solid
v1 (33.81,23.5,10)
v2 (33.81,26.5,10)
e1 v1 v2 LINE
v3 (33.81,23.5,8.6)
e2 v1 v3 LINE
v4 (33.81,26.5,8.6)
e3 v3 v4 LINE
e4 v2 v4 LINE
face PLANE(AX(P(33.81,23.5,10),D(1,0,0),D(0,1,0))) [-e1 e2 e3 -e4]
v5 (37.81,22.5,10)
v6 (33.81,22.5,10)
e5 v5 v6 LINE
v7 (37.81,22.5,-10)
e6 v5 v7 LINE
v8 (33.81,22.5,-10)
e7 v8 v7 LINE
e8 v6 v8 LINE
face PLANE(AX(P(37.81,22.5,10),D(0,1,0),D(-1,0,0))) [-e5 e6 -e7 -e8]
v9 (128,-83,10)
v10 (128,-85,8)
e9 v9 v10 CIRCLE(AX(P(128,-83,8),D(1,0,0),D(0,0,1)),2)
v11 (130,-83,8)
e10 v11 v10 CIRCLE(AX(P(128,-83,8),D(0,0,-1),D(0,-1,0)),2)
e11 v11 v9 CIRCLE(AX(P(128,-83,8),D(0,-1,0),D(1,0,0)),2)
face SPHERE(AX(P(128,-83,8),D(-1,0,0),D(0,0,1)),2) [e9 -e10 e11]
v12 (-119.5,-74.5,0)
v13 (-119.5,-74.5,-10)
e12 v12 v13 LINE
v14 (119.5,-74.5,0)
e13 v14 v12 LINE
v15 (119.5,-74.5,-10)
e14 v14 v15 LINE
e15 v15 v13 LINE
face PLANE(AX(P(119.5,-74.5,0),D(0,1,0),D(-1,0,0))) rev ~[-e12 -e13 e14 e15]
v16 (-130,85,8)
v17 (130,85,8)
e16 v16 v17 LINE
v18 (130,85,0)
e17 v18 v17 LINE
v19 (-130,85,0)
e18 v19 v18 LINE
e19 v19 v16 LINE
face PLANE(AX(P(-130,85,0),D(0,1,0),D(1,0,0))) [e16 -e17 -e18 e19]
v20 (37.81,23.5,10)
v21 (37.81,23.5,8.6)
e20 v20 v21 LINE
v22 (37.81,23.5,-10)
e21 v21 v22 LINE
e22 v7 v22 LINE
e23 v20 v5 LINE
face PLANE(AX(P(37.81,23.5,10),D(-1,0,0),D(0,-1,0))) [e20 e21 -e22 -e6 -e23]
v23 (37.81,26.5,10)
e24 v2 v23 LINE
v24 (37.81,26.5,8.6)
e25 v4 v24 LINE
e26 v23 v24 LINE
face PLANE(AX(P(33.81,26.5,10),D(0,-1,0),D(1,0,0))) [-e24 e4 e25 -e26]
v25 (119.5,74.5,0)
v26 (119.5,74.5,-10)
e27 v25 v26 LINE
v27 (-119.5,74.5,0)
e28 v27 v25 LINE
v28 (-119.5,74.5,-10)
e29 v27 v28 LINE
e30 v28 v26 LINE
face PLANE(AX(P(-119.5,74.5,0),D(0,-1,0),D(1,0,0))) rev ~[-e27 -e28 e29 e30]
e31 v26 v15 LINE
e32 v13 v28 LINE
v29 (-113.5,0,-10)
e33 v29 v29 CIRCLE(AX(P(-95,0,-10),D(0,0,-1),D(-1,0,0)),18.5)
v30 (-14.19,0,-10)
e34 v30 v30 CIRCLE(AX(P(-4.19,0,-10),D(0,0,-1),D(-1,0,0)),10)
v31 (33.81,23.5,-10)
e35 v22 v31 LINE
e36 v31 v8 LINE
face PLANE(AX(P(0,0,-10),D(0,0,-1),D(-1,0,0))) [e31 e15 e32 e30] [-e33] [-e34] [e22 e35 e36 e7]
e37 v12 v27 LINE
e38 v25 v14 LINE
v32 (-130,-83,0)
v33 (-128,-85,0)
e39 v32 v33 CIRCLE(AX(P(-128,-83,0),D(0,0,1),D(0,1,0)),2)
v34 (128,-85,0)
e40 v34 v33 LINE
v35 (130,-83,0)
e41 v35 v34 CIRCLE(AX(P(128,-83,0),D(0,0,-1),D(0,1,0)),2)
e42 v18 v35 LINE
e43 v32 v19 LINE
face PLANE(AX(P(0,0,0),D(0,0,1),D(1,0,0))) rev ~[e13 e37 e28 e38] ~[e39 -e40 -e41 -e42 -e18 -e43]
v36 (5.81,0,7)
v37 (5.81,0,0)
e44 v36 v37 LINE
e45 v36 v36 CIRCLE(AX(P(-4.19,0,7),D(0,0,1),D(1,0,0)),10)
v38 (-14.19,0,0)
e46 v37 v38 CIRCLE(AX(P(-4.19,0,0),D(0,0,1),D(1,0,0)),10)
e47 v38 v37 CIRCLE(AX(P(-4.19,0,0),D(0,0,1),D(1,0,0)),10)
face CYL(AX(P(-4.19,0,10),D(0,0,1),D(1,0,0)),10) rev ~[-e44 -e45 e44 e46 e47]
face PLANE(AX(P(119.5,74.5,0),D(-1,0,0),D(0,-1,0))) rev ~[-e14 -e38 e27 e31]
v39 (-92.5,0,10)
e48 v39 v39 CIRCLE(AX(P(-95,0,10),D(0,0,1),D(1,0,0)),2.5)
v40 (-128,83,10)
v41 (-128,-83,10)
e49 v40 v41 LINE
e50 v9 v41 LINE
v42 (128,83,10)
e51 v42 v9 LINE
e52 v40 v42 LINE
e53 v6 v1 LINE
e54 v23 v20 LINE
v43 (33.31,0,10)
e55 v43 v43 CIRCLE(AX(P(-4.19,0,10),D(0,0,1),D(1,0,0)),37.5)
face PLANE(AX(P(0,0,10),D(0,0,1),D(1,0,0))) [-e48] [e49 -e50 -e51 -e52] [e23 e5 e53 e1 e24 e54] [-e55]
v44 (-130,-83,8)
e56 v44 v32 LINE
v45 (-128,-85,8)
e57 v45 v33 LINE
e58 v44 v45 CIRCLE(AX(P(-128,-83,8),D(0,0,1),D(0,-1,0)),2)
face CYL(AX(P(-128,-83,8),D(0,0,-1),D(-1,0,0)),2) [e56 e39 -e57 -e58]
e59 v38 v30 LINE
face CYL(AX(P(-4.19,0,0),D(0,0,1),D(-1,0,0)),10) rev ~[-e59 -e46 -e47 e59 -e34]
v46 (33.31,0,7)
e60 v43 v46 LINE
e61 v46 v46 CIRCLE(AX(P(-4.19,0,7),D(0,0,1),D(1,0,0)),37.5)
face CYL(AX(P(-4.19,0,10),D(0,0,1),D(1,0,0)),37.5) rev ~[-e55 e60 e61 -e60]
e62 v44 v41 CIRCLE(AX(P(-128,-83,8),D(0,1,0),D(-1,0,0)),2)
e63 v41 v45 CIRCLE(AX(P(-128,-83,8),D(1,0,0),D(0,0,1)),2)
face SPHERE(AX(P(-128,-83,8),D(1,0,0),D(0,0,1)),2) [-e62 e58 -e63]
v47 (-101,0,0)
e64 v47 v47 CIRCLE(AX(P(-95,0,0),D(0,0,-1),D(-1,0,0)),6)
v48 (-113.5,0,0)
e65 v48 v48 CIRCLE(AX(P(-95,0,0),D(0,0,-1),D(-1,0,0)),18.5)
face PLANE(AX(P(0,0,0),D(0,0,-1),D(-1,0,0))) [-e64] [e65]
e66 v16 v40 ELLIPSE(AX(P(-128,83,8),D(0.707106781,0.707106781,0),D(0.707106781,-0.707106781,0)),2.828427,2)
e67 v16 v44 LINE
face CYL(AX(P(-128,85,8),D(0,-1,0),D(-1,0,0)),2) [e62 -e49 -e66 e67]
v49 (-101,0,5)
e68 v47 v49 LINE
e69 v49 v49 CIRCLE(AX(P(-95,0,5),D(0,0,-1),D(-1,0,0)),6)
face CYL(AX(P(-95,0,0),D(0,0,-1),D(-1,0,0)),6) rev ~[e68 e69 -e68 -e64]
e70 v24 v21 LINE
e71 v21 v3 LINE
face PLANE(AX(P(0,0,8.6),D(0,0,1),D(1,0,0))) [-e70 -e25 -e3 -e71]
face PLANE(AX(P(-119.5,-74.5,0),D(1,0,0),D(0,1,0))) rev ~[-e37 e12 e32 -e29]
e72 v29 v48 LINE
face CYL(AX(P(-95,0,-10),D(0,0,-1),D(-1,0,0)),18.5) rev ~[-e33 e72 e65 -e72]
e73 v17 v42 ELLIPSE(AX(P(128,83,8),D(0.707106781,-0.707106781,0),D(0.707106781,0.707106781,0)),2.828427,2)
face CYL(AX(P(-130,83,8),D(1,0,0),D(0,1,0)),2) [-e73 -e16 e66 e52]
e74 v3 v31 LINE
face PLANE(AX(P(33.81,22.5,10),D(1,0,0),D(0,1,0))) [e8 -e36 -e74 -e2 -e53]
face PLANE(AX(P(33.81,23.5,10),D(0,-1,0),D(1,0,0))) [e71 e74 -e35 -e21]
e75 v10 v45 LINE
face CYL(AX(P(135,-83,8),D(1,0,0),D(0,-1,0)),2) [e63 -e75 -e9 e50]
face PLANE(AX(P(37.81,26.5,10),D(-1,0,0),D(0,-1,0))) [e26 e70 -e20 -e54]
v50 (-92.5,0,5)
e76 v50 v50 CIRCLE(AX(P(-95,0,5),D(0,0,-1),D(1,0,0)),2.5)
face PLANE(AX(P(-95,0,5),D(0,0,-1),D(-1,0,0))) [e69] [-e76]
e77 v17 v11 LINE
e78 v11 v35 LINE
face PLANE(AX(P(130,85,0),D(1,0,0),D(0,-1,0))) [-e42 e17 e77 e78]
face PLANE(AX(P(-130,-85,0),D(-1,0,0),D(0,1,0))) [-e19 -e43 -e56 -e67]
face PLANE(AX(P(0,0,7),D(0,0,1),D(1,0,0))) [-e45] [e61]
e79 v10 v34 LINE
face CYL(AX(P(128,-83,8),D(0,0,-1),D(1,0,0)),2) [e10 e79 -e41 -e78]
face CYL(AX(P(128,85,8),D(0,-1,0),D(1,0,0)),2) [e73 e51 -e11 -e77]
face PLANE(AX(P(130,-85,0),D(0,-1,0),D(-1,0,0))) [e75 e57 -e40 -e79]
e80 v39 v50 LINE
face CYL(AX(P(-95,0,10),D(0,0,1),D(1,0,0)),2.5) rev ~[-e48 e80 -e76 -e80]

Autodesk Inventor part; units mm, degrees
ref_plane "YZ Plane" through (0, 0, 0) normal (1, 0, 0) x (0, 1, 0)
ref_plane "XZ Plane" through (0, 0, 0) normal (0, 1, 0) x (-1, 0, 0)
ref_plane "XY Plane" through (0, 0, 0) normal (0, 0, 1) x (1, 0, 0)
sketch "Boceto2" plane through (0, 0, 0) normal (0, 0, 1) x (1, 0, 0)
  line L0 (130, -85) -> (-130, -85)
  line L1 (-130, -85) -> (-130, 85)
  line L2 (-130, 85) -> (130, 85)
  line L3 (130, 85) -> (130, -85)
  line L4 (130, -85) -> (-130, 85) construction
  line L5 (-130, -85) -> (130, 85) construction
  point P0 (0, 0)
  dimension "d0" = 260
  dimension "d1" = 170
extrude "Extrusión1" add sketch "Boceto2" along normal blind 10
sketch "Boceto3" plane through (0, 0, 10) normal (0, 0, 1) x (1, 0, 0)
  line L0 (-95, 0) -> (-4.19, 0) construction
  circle A0 centre (-95, 0) radius 2.5
  circle A1 centre (-4.19, 0) radius 10
  line L1 (-130, 85) -> (-130, -85) projected
  line L2 (130, -85) -> (130, 85) projected
  line L3 (-130, -85) -> (130, -85) projected
  line L4 (130, 0) -> (80, 0) construction
  line L5 (80, 0) -> (80, -23.2237) construction
  point P0 (0, 0)
  point P1 (-130, 0)
  dimension "d7" = 5
  dimension "d8" = 20
  dimension "d14" = 85
  dimension "d29" = 50
  dimension "d30" = 90.81
  dimension "d31" = 35
  dimension "d32" = 134.19
extrude "Extrusión2" cut sketch "Boceto3" against normal through all
sketch "Boceto5" plane through (0, 0, 0) normal (0, 0, -1) x (-1, 0, 0)
  line L0 (-130, -85) -> (-130, 85) projected
  line L1 (130, -85) -> (-130, -85)
  line L2 (-130, -85) -> (-130, 85)
  line L3 (-130, 85) -> (130, 85)
  line L4 (130, 85) -> (130, -85)
  line L5 (130, -85) -> (-130, 85) construction
  line L6 (-130, -85) -> (130, 85) construction
  line L7 (119.5, 74.5) -> (-119.5, 74.5)
  line L8 (-119.5, 74.5) -> (-119.5, -74.5)
  line L9 (-119.5, -74.5) -> (119.5, -74.5)
  line L10 (119.5, -74.5) -> (119.5, 74.5)
  circle A0 centre (4.19, 0) radius 10 projected
  circle A1 centre (4.19, 0) radius 20
  circle A2 centre (95, 0) radius 2.5 projected
  circle A3 centre (95, 0) radius 2.5
  point P0 (0, 0)
  dimension "d23" = 10.5
  dimension "d24" = 40
  dimension "d25" = 5
extrude "Extrusión4" add sketch "Boceto5" along normal blind 10 contours L10 L9 L8 L7 | A1
fillet "Empalme1" radius 2 1 edges at (0, -85, 10)
fillet "Empalme2" radius 2 7 edges at (0, 85, 10) (-130, -84.4142, 9.4142) (-130, -85, 4) (-130, 1, 10) (130, -84.4142, 9.4142) (130, -85, 4) (130, 1, 10)
sketch "Boceto6" plane through (0, 0, 10) normal (0, 0, 1) x (1, 0, 0)
  circle A0 centre (-4.19, 0) radius 10 projected
  line L0 (-4.19, 0) -> (35.81, 0)
  line L1 (35.81, 0) -> (35.81, 25)
  line L2 (37.81, 23.5) -> (33.81, 23.5)
  line L3 (33.81, 23.5) -> (33.81, 26.5)
  line L4 (33.81, 26.5) -> (37.81, 26.5)
  line L5 (37.81, 26.5) -> (37.81, 23.5)
  line L6 (37.81, 23.5) -> (33.81, 26.5) construction
  line L7 (33.81, 23.5) -> (37.81, 26.5) construction
  point P0 (0, 0)
  dimension "d35" = 40
  dimension "d36" = 25
  dimension "d38" = 4
  dimension "d39" = 3
extrude "Extrusión5" cut sketch "Boceto6" against normal blind 1.4 contours L2 L3 L4 L5
sketch "Boceto8" plane through (0, 0, 10) normal (0, 0, 1) x (1, 0, 0)
  line L0 (33.81, 23.5) -> (33.81, 26.5) projected
  line L1 (33.81, 23.5) -> (37.81, 23.5)
  line L2 (37.81, 23.5) -> (37.81, 22.5)
  line L3 (37.81, 22.5) -> (33.81, 22.5)
  line L4 (33.81, 22.5) -> (33.81, 23.5)
  point P0 (0, 0)
  dimension "d42" = 4
  dimension "d43" = 1
extrude "Extrusión6" cut sketch "Boceto8" against normal through all
sketch "Boceto9" plane through (0, 0, 10) normal (0, 0, 1) x (1, 0, 0)
  circle A0 centre (-4.19, 0) radius 10 projected
  circle A1 centre (-4.19, 0) radius 37.5
  circle A2 centre (-4.19, 0) radius 10
  point P0 (0, 0)
  dimension "d47" = 75
extrude "Extrusión7" cut sketch "Boceto9" against normal blind 3
sketch "Boceto10" plane through (0, 0, -10) normal (0, 0, -1) x (-1, 0, 0)
  circle A0 centre (95, 0) radius 2.5 projected
  circle A1 centre (95, 0) radius 18.5
  circle A2 centre (95, 0) radius 6
  point P0 (0, 0)
  dimension "d50" = 37
  dimension "d51" = 12
extrude "Extrusión8" cut sketch "Boceto10" against normal blind 10 contours A1 | A2
sketch "Boceto11" plane through (-95, 0, 0) normal (0, 0, -1) x (-1, 0, 0)
  circle A0 centre (0, 0) radius 2.5 projected
  circle A1 centre (0, 0) radius 6
  point P0 (-95, 0)
  dimension "d54" = 12
extrude "Extrusión9" cut sketch "Boceto11" against normal blind 5
properties part number "Lid"
